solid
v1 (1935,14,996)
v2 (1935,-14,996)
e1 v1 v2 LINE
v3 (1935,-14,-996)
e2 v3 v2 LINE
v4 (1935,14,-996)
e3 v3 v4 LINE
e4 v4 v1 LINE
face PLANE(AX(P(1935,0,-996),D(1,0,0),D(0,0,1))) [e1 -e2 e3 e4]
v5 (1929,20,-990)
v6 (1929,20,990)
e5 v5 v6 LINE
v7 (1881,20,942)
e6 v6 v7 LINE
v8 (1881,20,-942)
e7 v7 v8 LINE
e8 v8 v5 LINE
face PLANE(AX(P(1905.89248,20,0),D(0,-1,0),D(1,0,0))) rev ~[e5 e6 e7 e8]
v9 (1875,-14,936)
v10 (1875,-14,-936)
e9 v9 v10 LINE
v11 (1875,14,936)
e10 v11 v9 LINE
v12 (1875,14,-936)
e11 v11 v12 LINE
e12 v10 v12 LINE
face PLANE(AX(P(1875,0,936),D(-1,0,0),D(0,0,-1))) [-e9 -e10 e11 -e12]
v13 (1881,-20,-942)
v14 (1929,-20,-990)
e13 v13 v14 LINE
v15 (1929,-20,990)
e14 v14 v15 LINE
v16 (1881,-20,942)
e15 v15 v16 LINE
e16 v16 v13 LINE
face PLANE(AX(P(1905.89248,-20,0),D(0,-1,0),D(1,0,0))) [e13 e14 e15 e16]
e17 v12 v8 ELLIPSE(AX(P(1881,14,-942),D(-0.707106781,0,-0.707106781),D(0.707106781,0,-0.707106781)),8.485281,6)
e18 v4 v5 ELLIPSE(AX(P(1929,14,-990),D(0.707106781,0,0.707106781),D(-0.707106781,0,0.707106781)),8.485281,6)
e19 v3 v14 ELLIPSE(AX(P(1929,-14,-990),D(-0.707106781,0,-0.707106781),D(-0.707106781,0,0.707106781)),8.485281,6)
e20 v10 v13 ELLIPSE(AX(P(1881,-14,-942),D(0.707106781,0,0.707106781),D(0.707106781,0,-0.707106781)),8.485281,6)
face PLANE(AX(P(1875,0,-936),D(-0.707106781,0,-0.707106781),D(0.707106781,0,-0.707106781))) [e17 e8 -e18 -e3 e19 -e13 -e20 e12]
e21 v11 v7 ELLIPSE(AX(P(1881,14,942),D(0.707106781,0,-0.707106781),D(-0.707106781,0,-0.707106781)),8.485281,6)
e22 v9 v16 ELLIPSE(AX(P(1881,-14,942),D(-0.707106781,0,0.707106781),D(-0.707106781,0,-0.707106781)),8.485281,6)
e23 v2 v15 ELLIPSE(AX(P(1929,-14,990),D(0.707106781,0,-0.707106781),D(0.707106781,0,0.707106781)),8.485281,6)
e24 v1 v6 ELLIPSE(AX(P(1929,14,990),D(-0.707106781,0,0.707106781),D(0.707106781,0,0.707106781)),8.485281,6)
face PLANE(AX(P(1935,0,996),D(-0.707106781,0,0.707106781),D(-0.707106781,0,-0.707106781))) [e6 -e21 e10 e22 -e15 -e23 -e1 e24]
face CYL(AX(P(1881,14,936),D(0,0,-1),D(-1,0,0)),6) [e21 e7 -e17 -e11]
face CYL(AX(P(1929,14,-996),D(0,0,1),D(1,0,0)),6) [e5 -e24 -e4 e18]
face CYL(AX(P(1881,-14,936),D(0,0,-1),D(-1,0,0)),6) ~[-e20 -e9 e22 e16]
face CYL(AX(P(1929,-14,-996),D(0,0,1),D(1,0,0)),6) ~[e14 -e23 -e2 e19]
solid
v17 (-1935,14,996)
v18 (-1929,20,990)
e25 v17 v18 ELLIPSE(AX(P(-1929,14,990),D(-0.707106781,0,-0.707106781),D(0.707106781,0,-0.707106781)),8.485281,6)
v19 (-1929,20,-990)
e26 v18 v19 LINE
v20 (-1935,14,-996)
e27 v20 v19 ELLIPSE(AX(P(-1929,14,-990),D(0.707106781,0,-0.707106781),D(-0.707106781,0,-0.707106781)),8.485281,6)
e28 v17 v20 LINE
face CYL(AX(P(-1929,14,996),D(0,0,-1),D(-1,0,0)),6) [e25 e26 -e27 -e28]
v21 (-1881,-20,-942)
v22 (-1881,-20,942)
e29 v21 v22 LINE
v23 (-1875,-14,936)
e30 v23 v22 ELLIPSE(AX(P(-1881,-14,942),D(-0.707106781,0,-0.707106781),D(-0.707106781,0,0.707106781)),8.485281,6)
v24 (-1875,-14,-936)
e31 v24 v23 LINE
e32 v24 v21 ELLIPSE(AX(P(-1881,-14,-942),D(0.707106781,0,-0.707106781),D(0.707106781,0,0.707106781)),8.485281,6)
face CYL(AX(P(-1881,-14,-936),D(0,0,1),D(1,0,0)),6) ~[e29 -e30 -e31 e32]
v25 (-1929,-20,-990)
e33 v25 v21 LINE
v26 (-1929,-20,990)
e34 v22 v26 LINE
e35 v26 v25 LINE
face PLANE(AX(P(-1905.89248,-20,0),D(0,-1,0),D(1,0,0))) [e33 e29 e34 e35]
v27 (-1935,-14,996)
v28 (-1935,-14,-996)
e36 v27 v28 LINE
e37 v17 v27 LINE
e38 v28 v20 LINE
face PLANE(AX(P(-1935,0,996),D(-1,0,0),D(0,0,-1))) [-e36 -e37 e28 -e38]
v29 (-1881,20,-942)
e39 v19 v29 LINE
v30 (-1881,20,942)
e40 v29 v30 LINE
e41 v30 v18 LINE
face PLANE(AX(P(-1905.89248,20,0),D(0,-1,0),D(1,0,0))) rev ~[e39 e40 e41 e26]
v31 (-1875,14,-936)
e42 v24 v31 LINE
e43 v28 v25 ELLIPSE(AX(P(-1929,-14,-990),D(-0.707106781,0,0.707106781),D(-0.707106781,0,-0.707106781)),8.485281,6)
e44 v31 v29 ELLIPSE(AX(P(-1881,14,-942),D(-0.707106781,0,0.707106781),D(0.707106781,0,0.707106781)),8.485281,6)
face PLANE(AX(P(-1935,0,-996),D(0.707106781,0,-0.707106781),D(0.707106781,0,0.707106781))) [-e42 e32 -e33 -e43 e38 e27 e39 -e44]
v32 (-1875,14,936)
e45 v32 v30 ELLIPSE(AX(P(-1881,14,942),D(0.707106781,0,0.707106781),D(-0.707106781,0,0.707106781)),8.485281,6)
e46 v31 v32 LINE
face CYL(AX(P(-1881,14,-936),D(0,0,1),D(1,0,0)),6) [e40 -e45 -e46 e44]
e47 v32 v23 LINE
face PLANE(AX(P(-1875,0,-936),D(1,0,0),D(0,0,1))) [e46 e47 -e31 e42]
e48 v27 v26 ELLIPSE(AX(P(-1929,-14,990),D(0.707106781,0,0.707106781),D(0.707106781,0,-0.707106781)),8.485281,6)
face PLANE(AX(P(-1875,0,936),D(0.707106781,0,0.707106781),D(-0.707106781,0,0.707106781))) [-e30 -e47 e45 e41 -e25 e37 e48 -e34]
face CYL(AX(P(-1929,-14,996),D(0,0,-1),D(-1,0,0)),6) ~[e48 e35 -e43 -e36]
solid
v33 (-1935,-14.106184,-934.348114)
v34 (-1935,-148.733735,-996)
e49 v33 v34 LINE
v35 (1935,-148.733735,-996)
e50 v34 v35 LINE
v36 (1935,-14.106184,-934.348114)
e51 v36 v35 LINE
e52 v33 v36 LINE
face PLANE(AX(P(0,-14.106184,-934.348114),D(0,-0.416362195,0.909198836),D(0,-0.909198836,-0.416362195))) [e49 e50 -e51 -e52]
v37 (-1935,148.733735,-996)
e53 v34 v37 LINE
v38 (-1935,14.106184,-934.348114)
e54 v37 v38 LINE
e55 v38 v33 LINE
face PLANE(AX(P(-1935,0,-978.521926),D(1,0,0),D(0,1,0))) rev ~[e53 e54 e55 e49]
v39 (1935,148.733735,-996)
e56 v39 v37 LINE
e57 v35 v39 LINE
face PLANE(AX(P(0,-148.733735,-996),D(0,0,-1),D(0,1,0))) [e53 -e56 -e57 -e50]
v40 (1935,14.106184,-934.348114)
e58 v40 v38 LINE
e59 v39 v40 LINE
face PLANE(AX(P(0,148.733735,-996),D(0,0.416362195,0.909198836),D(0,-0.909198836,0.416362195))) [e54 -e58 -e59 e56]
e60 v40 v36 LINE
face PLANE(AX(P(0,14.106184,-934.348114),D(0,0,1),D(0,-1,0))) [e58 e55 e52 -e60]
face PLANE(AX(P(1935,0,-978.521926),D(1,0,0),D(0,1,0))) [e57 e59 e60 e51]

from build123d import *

# Parameters (mm, degrees)
F1_DEPTH      = 20
F3_DEPTH      = 477.5
F4_R          = 6
F4_2_R        = 6
F7_DEPTH      = 1935
F7_DEPTH_BACK = 1935
F8_W          = 3750.3852844238
F8_H          = 4.1501820087
F9_DEPTH      = 10


# Not quite as in the source:
# - a feature names something its author has since deleted; it is built from what else it names


with BuildPart() as f1:
    # F0 (on Front) → F1 (new body, symmetric)
    with BuildSketch(Plane.XZ):
        Polygon((-1875, -936), (-1875, 936), (-1935, 996), (-1935, -996), align=None)
    extrude(amount=F1_DEPTH, both=True)

    # F4
    f4_edges = [f1.edges().sort_by_distance(p)[0] for p in [
        (-1875, -20, 0),
        (-1935, -20, 0),
        (-1875, 20, 0),
        (-1935, 20, 0),
    ]]
    fillet(f4_edges, radius=F4_R)


with BuildPart() as f1b:
    # F0 (on Front) → F1, piece 2 (new body, symmetric)
    with BuildSketch(Plane.XZ):
        Polygon((1935, -996), (1935, 996), (1875, 936), (1875, -936), align=None)
    extrude(amount=F1_DEPTH, both=True)

    # F4#2
    f4_2_edges = [f1b.edges().sort_by_distance(p)[0] for p in [
        (1935, -20, 0),
        (1875, -20, 0),
        (1935, 20, 0),
        (1875, 20, 0),
    ]]
    fillet(f4_2_edges, radius=F4_2_R)


with BuildPart() as f3:
    # F2 (on Top) → F3 (new body, symmetric)
    with BuildSketch(Plane.XY):
        with BuildLine():
            ThreePointArc((-758, 14), (-758.8786796564, 16.1213203436), (-761, 17))
            Line((-761, 17), (-809, 17))
            ThreePointArc((-809, 17), (-811.1213203436, 16.1213203436), (-812, 14))
            Line((-812, 14), (-812, -14))
            ThreePointArc((-812, -14), (-811.1213203436, -16.1213203436), (-809, -17))
            Line((-809, -17), (-761, -17))
            ThreePointArc((-761, -17), (-758.8786796564, -16.1213203436), (-758, -14))
            Line((-758, -14), (-758, 14))
        make_face()
    extrude(amount=F3_DEPTH, both=True)


with BuildPart() as f3b:
    # F2 (on Top) → F3, piece 2 (new body, symmetric)
    with BuildSketch(Plane.XY):
        with BuildLine():
            ThreePointArc((809, -17), (811.1213203436, -16.1213203436), (812, -14))
            Line((812, -14), (812, 14))
            ThreePointArc((812, 14), (811.1213203436, 16.1213203436), (809, 17))
            Line((809, 17), (761, 17))
            ThreePointArc((761, 17), (758.8786796564, 16.1213203436), (758, 14))
            Line((758, 14), (758, -14))
            ThreePointArc((758, -14), (758.8786796564, -16.1213203436), (761, -17))
            Line((761, -17), (809, -17))
        make_face()
    extrude(amount=F3_DEPTH, both=True)


with BuildPart() as f1b_1:
    add(f1b.part)

    # F5: cut F3, F3b
    add(f3.part, mode=Mode.SUBTRACT)
    add(f3b.part, mode=Mode.SUBTRACT)


with BuildPart() as f1_1:
    add(f1.part)

    # F5: cut F3, F3b
    add(f3.part, mode=Mode.SUBTRACT)
    add(f3b.part, mode=Mode.SUBTRACT)

    # F8 (on face) → F9 (cut)
    with BuildSketch(Plane(origin=(0, 351.2576934301, -767.0319016123), x_dir=(1, 0, 0), z_dir=(0, -0.4163621946, 0.9091988357))):
        with Locations((-0.204205513, -176.041290164)):
            Rectangle(F8_W, F8_H)
        with Locations((-0.204205513, -171.8911081553)):
            Rectangle(F8_W, F8_H)
    extrude(amount=-F9_DEPTH, mode=Mode.SUBTRACT)


with BuildPart() as f7:
    # F6 (on Right) → F7 (new body, two sides)
    with BuildSketch(Plane.YZ) as f7_sk:
        Polygon((14.1061842442, -934.3481144905), (0, -934.3481144905), (-14.1061842442, -934.3481144905), (-148.7337350845, -996), (0, -996), (148.7337350845, -996), align=None)
    extrude(amount=F7_DEPTH)
    extrude(f7_sk.sketch, amount=-F7_DEPTH_BACK)


solid = Compound([f1b_1.part, f1_1.part, f7.part])
